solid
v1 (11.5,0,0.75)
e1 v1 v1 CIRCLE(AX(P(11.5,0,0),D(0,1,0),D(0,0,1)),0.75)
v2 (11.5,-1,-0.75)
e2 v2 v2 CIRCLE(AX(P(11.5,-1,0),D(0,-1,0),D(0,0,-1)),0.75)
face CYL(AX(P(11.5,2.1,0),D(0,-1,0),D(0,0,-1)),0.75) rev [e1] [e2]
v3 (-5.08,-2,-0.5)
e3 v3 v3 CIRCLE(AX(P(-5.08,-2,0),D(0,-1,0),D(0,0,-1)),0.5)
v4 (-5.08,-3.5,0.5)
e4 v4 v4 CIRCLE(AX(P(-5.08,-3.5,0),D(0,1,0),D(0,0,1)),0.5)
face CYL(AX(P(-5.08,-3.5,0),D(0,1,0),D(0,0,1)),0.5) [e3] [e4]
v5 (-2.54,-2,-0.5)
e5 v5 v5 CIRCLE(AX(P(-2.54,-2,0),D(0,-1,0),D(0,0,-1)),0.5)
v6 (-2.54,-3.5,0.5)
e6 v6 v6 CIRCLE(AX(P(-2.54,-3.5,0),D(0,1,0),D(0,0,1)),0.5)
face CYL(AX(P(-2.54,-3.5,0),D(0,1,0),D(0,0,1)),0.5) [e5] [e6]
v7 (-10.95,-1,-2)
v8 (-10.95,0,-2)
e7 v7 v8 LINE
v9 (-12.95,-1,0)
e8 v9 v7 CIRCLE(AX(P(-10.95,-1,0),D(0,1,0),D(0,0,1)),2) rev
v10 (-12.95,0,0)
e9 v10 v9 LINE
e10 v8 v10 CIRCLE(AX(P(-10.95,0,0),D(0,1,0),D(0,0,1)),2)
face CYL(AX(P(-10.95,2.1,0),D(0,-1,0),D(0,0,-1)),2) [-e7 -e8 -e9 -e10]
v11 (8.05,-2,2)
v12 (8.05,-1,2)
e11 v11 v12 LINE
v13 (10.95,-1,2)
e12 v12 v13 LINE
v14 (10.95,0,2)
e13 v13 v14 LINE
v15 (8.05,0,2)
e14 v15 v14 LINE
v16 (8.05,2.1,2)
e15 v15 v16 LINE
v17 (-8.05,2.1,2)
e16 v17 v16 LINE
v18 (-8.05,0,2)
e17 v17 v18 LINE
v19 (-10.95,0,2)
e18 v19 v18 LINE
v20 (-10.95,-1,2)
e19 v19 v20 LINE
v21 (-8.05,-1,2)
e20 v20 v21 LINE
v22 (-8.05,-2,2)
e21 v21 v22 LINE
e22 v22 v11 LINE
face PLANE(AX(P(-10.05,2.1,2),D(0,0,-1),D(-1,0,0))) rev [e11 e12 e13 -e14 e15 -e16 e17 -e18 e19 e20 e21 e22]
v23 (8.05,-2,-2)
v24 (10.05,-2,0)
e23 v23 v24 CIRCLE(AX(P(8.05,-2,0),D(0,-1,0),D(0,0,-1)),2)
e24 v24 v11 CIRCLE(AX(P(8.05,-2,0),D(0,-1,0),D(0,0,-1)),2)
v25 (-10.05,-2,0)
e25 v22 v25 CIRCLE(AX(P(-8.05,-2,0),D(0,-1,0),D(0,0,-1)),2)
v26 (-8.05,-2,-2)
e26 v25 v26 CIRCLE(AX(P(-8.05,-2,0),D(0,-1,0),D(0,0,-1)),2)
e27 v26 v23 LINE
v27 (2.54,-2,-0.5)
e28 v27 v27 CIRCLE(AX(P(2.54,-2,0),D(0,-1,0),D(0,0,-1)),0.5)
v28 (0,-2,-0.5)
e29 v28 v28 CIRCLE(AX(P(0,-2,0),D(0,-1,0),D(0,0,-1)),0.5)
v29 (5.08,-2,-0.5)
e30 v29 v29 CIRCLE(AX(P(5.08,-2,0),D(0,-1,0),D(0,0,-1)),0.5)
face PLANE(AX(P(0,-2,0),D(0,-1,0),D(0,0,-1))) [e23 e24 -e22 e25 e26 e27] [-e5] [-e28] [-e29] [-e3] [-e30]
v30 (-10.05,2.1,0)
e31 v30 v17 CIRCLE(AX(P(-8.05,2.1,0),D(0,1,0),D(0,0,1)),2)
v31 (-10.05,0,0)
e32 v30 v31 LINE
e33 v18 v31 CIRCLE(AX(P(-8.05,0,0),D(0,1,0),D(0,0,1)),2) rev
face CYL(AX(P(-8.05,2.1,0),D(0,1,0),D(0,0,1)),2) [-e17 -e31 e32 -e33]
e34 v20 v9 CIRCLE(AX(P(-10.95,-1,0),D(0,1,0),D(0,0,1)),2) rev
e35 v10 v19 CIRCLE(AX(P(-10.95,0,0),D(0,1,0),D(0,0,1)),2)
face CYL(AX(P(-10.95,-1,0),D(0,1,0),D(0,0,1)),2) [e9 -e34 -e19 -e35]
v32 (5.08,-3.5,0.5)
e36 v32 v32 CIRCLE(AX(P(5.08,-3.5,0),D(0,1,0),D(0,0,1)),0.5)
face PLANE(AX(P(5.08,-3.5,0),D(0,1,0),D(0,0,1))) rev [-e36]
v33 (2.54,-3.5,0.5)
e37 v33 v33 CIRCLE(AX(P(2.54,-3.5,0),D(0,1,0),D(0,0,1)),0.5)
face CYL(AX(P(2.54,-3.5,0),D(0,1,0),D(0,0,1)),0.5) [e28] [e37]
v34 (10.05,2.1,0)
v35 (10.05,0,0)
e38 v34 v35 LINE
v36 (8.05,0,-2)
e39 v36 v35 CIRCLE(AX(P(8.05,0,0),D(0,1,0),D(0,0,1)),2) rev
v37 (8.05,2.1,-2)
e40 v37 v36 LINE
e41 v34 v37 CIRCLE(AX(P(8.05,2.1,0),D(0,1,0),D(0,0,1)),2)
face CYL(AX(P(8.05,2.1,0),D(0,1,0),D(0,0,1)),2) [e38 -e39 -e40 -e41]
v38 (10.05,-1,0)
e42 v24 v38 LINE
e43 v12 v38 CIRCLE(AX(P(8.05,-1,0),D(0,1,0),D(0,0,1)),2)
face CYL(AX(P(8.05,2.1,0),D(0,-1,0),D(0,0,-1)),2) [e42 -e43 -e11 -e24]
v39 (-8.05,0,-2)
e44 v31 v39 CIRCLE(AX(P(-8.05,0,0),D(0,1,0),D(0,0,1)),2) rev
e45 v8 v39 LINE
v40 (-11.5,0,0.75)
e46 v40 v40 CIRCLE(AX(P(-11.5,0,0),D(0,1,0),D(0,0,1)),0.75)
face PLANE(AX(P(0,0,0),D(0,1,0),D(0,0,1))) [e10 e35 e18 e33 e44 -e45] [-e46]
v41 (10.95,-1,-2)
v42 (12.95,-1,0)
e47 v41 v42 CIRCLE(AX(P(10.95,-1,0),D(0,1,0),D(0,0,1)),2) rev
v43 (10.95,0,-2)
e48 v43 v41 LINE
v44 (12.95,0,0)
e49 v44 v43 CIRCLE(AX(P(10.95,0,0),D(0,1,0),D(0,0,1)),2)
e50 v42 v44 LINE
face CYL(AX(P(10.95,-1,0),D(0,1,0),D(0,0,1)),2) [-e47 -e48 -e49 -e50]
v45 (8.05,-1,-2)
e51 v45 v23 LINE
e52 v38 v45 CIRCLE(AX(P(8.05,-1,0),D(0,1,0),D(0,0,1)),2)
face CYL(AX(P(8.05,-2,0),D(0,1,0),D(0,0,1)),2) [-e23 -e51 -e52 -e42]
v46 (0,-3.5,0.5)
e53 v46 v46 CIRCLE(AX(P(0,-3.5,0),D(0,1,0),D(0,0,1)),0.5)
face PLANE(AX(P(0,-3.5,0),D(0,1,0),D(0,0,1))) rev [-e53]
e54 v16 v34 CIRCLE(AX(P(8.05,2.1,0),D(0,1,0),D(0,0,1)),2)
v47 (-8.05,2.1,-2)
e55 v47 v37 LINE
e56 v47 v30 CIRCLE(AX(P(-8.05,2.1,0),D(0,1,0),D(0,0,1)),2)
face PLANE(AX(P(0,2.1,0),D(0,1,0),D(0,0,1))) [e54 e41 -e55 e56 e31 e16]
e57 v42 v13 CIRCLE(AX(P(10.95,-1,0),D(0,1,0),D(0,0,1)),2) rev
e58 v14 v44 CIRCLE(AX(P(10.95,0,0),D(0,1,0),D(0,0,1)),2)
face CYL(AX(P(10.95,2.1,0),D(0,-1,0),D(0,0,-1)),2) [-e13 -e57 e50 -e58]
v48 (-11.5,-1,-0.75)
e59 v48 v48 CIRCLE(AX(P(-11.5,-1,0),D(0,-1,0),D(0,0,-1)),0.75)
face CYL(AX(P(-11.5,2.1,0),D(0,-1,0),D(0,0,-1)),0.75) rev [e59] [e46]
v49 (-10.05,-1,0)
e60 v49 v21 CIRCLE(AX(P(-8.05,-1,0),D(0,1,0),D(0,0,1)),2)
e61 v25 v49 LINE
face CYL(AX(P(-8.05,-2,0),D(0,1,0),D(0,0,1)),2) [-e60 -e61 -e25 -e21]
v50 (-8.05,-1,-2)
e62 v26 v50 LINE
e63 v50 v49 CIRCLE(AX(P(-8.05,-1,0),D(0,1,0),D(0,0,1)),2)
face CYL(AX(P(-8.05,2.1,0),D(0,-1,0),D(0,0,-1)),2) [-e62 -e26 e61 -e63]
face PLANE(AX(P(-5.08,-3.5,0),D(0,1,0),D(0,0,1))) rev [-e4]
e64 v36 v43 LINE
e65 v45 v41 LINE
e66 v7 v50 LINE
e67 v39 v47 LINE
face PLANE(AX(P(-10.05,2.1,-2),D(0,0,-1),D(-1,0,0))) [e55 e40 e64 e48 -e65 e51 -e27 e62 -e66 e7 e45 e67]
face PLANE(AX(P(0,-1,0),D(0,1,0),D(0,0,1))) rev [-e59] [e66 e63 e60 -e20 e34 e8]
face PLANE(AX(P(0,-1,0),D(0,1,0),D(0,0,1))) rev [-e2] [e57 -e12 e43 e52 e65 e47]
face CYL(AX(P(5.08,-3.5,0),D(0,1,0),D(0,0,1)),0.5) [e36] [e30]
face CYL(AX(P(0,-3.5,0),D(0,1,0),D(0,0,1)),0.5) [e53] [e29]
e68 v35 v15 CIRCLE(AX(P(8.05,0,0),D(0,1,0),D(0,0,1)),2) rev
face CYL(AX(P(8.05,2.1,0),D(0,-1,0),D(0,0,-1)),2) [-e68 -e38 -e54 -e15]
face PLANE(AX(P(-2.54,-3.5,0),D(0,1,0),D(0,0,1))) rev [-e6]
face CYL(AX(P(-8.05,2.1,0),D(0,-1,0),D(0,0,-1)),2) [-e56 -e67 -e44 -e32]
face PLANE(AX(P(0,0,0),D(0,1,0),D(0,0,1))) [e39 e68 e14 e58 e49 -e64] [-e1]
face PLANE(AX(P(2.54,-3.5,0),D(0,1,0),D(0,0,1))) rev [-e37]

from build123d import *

# Parameters (mm, degrees)
SKETCH_1_W          = 20.1
SKETCH_1_H          = 4
EXTRUDE_1_DEPTH     = 2.1
SKETCH_1_3_W        = 25.9
SKETCH_1_3_H        = 4
EXTRUDE_2_DEPTH     = 1
EXTRUDE_START       = -1
SKETCH_1_4_W        = 20.1
SKETCH_1_4_H        = 4
EXTRUDE_4_DEPTH     = 1
FILLET_2_R          = 2
FILLET_1_R          = 2
SKETCH_2_R          = 0.75
CUT_EXTRUDE_1_DEPTH = 14.465233009
EXTRUDE_START_2     = -3.1
SKETCH_3_R          = 0.5
EXTRUDE_3_DEPTH     = 5.6


with BuildPart() as part:
    # 草图1 → 凸台-拉伸1 (new body)
    with BuildSketch(Plane(origin=(0, 0, 0), x_dir=(1, 0, 0), z_dir=(0, 1, 0))):
        Rectangle(SKETCH_1_W, SKETCH_1_H)
    extrude(amount=EXTRUDE_1_DEPTH)

    # 草图1<3> → 凸台-拉伸2 (add)
    with BuildSketch(Plane(origin=(0, 0, 0), x_dir=(1, 0, 0), z_dir=(0, 1, 0))):
        Rectangle(SKETCH_1_3_W, SKETCH_1_3_H)
    extrude(amount=-EXTRUDE_2_DEPTH)

    # 草图1<4> → 凸台-拉伸4 (add)
    with BuildSketch(Plane(origin=(0, 0, 0), x_dir=(1, 0, 0), z_dir=(0, 1, 0)).offset(EXTRUDE_START)):
        Rectangle(SKETCH_1_4_W, SKETCH_1_4_H)
    extrude(amount=-EXTRUDE_4_DEPTH)

    # 圆角2
    fillet_2_edges = [part.edges().sort_by_distance(p)[0] for p in [
        (12.95, -0.5, 2),
        (12.95, -0.5, -2),
        (-12.95, -0.5, 2),
        (-12.95, -0.5, -2),
    ]]
    fillet(fillet_2_edges, radius=FILLET_2_R - 0.0001)  # a hair under: the kernel refuses the full size

    # 圆角1
    fillet_1_edges = [part.edges().sort_by_distance(p)[0] for p in [
        (10.05, 1.05, -2),
        (10.05, 1.05, 2),
        (-10.05, 1.05, 2),
        (-10.05, 1.05, -2),
        (-10.05, -1.5, -2),
        (-10.05, -1.5, 2),
        (10.05, -1.5, 2),
        (10.05, -1.5, -2),
    ]]
    fillet(fillet_1_edges, radius=FILLET_1_R - 0.0001)  # a hair under: the kernel refuses the full size

    # 草图2 → 切除-拉伸1 (cut, through all)
    with BuildSketch(Plane(origin=(0, -1, 0), x_dir=(-1, 0, 0), z_dir=(0, -1, 0))):
        with Locations(Location((11.5, 0, 0), (0, 0, 90))):
            Circle(SKETCH_2_R)
        with Locations(Location((-11.5, 0, 0), (0, 0, 90))):
            Circle(SKETCH_2_R)
    extrude(amount=-CUT_EXTRUDE_1_DEPTH, mode=Mode.SUBTRACT)

    # 草图3 → 凸台-拉伸3 (add)
    with BuildSketch(Plane.XZ.offset(1).offset(EXTRUDE_START_2)):
        with Locations(Location((0, 0, 0), (0, 0, 90))):
            Circle(SKETCH_3_R)
        with Locations(Location((2.54, 0, 0), (0, 0, 90))):
            Circle(SKETCH_3_R)
        with Locations(Location((-2.54, 0, 0), (0, 0, 90))):
            Circle(SKETCH_3_R)
        with Locations(Location((-5.08, 0, 0), (0, 0, 90))):
            Circle(SKETCH_3_R)
        with Locations(Location((5.08, 0, 0), (0, 0, 90))):
            Circle(SKETCH_3_R)
    extrude(amount=EXTRUDE_3_DEPTH)


solid = part.part
